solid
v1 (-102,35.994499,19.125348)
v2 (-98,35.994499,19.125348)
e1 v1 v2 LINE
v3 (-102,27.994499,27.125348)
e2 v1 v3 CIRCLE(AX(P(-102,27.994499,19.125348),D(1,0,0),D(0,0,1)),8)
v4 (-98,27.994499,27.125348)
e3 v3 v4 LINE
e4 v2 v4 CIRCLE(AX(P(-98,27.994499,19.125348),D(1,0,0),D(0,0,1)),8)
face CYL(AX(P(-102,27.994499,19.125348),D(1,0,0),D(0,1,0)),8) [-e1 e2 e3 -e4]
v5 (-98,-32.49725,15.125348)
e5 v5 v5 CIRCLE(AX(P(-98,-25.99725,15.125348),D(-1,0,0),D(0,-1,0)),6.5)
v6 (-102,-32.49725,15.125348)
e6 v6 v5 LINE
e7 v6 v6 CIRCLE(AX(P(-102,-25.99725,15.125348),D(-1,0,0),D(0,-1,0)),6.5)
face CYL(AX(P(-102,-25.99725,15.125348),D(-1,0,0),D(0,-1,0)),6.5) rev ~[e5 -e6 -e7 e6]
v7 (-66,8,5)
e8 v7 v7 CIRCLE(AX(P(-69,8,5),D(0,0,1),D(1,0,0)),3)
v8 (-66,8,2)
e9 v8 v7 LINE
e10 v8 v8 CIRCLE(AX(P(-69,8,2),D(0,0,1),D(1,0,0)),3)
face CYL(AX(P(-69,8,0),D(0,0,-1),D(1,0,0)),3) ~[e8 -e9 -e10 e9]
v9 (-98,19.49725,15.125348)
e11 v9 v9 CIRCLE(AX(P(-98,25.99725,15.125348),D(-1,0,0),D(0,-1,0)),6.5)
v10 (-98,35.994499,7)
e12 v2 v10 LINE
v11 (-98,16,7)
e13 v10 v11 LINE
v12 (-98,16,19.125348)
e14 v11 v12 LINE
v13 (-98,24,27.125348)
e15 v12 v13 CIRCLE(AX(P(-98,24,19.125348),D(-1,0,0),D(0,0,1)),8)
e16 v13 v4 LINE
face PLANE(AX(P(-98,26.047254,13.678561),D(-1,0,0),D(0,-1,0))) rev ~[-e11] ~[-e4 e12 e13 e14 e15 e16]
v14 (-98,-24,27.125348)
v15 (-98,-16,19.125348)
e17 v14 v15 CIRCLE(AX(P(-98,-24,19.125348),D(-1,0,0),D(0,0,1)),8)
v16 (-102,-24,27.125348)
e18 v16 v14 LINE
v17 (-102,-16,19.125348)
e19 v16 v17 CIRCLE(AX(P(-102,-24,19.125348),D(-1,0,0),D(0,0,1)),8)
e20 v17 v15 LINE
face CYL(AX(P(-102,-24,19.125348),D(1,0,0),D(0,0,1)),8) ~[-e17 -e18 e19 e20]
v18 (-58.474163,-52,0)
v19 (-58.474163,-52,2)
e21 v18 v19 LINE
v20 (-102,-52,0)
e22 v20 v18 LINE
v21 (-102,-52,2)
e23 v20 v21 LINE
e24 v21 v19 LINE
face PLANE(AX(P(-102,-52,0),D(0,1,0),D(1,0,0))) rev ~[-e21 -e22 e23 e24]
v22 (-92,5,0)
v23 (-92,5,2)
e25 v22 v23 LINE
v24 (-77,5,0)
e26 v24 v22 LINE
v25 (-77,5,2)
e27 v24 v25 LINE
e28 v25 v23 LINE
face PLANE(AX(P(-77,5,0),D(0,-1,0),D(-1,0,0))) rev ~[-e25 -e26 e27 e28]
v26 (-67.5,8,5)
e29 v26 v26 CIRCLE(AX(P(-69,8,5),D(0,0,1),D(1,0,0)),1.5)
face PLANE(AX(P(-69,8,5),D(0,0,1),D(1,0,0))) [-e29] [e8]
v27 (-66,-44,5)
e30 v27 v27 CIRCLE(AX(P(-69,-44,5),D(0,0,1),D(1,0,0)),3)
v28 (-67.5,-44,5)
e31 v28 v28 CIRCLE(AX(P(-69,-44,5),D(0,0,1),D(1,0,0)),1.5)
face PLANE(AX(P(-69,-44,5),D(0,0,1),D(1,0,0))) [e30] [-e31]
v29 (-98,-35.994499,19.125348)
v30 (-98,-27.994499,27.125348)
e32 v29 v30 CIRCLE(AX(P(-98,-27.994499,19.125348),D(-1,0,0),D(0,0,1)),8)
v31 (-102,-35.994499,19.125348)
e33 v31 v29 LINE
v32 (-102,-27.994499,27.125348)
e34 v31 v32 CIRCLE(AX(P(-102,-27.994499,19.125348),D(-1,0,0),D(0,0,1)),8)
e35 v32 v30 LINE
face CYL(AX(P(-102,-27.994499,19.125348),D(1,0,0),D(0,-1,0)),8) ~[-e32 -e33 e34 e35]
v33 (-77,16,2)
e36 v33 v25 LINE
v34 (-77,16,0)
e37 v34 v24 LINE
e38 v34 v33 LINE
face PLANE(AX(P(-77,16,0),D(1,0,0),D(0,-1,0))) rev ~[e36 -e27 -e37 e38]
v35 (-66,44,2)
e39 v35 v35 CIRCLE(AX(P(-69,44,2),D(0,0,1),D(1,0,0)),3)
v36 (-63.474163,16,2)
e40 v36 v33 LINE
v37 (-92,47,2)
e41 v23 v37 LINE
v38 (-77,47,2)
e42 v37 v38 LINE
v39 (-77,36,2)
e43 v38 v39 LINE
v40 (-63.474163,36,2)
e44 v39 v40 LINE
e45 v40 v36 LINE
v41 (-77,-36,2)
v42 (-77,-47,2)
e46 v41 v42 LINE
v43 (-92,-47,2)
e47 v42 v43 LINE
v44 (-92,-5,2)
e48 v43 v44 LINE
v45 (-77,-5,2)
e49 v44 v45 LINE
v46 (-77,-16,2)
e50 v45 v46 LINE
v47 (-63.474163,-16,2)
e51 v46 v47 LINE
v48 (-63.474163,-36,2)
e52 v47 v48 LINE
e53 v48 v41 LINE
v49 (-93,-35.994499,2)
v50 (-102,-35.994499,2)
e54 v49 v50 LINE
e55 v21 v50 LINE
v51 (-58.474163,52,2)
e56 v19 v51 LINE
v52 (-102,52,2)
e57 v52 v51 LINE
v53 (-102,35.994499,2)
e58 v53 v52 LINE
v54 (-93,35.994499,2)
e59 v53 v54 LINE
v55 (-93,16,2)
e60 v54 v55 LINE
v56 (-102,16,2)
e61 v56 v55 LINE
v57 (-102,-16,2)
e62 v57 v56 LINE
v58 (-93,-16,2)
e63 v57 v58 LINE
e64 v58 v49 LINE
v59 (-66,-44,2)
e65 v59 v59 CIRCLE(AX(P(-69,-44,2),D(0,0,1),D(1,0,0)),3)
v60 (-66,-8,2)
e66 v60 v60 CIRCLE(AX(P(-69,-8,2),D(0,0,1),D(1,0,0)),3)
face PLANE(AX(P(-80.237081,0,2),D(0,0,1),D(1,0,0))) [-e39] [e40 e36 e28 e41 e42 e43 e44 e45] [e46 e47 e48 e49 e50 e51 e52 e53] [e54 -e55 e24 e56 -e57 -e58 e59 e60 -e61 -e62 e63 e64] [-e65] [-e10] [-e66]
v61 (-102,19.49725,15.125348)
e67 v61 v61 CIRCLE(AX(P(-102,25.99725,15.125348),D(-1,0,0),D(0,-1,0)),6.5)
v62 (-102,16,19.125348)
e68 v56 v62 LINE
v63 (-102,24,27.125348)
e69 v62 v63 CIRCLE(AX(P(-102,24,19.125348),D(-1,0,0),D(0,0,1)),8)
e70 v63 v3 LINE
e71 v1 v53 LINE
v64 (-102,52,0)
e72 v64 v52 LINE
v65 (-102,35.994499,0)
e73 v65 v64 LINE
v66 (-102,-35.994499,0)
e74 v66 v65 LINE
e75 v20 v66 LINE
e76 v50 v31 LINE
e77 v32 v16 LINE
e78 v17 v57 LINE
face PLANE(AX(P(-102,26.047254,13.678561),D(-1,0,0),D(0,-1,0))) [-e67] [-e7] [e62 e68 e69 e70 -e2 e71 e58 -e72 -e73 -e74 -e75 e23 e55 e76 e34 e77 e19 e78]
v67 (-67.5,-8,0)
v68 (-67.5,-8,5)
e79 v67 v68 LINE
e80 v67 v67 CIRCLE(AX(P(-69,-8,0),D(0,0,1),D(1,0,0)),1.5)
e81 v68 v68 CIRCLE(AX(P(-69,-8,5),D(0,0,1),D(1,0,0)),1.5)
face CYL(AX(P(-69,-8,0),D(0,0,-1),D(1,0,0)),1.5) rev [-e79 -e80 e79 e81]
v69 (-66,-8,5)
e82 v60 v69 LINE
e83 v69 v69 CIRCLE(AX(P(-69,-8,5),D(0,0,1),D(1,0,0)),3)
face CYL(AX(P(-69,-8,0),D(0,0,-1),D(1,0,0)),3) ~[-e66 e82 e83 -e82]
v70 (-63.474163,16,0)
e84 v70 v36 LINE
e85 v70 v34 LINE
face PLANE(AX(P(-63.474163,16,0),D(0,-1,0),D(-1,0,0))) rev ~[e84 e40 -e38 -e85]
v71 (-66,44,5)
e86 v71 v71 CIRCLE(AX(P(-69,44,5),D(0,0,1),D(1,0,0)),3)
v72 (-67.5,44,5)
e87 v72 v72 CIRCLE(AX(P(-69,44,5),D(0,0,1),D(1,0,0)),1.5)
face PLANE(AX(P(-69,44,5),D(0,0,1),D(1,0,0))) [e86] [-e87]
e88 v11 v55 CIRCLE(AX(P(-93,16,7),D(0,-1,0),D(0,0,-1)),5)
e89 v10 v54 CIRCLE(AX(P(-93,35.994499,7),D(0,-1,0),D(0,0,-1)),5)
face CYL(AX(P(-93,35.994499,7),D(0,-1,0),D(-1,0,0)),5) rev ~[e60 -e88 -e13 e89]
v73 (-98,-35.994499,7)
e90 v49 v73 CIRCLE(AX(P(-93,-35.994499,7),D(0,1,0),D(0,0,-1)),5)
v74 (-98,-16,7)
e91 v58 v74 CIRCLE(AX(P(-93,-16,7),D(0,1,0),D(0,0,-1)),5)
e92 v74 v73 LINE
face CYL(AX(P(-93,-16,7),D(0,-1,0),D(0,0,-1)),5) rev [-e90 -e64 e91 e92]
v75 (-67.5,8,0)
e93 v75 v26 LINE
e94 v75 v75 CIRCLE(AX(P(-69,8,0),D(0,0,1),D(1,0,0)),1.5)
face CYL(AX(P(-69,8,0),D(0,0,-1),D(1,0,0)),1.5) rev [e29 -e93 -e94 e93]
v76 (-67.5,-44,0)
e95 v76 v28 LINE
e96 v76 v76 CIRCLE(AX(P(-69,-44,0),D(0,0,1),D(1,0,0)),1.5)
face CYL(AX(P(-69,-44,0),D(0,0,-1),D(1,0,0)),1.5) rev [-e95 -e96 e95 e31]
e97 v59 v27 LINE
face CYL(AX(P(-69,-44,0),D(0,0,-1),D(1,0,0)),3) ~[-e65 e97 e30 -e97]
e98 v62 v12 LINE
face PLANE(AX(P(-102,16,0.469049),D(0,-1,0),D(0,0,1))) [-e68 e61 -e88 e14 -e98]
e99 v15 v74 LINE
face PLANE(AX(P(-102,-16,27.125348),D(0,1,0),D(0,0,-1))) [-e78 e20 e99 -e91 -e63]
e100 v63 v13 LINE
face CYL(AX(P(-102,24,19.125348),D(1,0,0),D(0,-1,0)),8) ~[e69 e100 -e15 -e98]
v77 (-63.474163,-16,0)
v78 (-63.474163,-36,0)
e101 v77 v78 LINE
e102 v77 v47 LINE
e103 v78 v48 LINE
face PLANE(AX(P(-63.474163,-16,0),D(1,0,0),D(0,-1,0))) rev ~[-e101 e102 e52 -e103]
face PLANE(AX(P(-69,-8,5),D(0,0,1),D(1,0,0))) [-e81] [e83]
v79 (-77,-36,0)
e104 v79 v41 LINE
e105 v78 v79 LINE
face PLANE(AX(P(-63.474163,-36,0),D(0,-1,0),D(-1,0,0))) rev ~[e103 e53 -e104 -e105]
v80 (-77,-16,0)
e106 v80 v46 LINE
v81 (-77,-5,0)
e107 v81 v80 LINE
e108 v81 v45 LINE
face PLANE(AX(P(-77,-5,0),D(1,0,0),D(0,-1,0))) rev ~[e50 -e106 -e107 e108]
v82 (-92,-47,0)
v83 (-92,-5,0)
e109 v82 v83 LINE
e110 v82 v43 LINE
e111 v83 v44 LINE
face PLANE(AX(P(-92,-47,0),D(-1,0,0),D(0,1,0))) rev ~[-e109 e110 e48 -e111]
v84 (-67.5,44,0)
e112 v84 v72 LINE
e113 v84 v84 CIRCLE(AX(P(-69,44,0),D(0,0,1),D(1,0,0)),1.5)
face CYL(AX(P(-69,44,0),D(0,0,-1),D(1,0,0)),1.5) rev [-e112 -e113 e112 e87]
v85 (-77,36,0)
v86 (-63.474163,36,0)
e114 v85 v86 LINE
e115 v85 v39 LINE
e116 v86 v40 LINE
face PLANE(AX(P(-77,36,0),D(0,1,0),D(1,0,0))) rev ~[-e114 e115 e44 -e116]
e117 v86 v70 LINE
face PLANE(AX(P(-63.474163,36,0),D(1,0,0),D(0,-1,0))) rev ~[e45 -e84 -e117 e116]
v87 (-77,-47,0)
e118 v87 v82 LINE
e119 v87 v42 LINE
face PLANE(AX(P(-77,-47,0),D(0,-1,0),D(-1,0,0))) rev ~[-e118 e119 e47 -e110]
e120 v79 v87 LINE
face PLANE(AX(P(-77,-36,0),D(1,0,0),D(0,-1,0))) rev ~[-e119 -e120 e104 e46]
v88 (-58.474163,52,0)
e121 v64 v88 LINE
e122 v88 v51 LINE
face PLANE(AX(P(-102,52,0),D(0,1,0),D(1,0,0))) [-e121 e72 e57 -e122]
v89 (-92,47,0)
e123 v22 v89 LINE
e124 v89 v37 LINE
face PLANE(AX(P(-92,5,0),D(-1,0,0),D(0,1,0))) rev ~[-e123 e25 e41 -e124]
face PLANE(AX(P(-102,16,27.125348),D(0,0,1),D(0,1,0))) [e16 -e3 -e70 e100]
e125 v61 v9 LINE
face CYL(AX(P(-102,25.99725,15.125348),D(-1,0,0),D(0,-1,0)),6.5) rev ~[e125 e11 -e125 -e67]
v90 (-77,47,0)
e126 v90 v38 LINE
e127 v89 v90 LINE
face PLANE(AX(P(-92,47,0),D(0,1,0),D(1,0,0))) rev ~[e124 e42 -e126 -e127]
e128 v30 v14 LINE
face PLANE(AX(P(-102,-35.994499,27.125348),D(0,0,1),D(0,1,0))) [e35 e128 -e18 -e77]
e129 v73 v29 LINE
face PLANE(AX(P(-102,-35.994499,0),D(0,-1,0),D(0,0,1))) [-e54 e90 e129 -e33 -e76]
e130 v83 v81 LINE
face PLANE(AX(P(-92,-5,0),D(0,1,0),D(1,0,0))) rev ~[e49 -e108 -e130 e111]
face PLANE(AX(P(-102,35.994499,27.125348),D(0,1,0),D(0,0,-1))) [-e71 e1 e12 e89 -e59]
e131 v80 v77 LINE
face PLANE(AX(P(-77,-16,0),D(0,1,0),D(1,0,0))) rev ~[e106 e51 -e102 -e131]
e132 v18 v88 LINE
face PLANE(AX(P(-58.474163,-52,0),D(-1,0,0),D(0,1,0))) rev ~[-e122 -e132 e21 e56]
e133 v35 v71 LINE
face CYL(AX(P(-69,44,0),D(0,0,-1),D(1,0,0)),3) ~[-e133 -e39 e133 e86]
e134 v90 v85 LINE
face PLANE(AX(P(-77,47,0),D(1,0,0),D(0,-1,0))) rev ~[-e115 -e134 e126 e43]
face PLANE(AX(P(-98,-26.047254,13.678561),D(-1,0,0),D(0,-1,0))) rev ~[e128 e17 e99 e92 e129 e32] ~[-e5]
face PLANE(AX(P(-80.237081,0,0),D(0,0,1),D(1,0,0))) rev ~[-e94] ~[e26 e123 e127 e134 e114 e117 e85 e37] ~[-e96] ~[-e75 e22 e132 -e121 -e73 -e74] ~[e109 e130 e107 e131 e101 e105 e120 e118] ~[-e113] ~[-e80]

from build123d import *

# Parameters (mm, degrees)
F0_R     = 3
F0_R_2   = 1.5
F1_DEPTH = 2
F0_W     = 43.5258374241
F0_H     = 104
F2_DEPTH = 5
F4_R     = 6.5
F5_DEPTH = 4
F6_R     = 5
F7_R     = 8


# Not quite as in the source:
# - a feature names something its author has since deleted; it is built from what else it names


with BuildPart() as f1:
    # F0 (on Top) → F1 (new body)
    with BuildSketch(Plane.XY):
        Polygon((21, 52), (20, 52), (-20, 52), (-21, 52), (-21, -52), (-20, -52), (20, -52), (21, -52), align=None)
        with Locations((-13, -44)):
            Circle(F0_R, mode=Mode.SUBTRACT)
        with Locations((13, -44)):
            Circle(F0_R, mode=Mode.SUBTRACT)
        with Locations((-13, -8)):
            Circle(F0_R, mode=Mode.SUBTRACT)
        Polygon((-5, -16), (-5, -5), (5, -5), (5, -16), (16, -16), (16, -36), (5, -36), (5, -47), (-5, -47), (-5, -36), (-16, -36), (-16, -16), align=None, mode=Mode.SUBTRACT)
        with Locations((13, -8)):
            Circle(F0_R, mode=Mode.SUBTRACT)
        with Locations((-13, 8)):
            Circle(F0_R, mode=Mode.SUBTRACT)
        with Locations((13, 8)):
            Circle(F0_R, mode=Mode.SUBTRACT)
        with Locations((-13, 44)):
            Circle(F0_R, mode=Mode.SUBTRACT)
        Polygon((-5, 36), (-5, 47), (5, 47), (5, 36), (16, 36), (16, 16), (5, 16), (5, 5), (-5, 5), (-5, 16), (-16, 16), (-16, 36), align=None, mode=Mode.SUBTRACT)
        with Locations((13, 44)):
            Circle(F0_R, mode=Mode.SUBTRACT)
        with Locations((-13, 8)):
            Circle(F0_R)
        with Locations((-13, 8)):
            Circle(F0_R_2, mode=Mode.SUBTRACT)
        with Locations((-13, 44)):
            Circle(F0_R)
        with Locations((-13, 44)):
            Circle(F0_R_2, mode=Mode.SUBTRACT)
    extrude(amount=F1_DEPTH)

    # F0 (on Top) → F2, piece 2 (join)
    with BuildSketch(Plane.XY):
        with Locations((-13, 8)):
            Circle(F0_R)
        with Locations((-13, 8)):
            Circle(F0_R_2, mode=Mode.SUBTRACT)
        with Locations((-13, 44)):
            Circle(F0_R)
        with Locations((-13, 44)):
            Circle(F0_R_2, mode=Mode.SUBTRACT)
        with Locations((13, 44)):
            Circle(F0_R)
        with Locations((13, 44)):
            Circle(F0_R_2, mode=Mode.SUBTRACT)
        with Locations((13, 8)):
            Circle(F0_R)
        with Locations((13, 8)):
            Circle(F0_R_2, mode=Mode.SUBTRACT)
        with Locations((-13, -8)):
            Circle(F0_R)
        with Locations((-13, -8)):
            Circle(F0_R_2, mode=Mode.SUBTRACT)
        with Locations((13, -8)):
            Circle(F0_R)
        with Locations((13, -8)):
            Circle(F0_R_2, mode=Mode.SUBTRACT)
        with Locations((-13, -44)):
            Circle(F0_R)
        with Locations((-13, -44)):
            Circle(F0_R_2, mode=Mode.SUBTRACT)
        with Locations((13, -44)):
            Circle(F0_R)
        with Locations((13, -44)):
            Circle(F0_R_2, mode=Mode.SUBTRACT)
    extrude(amount=F2_DEPTH)


with BuildPart() as f1b:
    # F0 (on Top) → F1, piece 2 (new body)
    with BuildSketch(Plane.XY):
        with Locations((-80.2370812879, 0)):
            Rectangle(F0_W, F0_H)
        with Locations((-69, -44)):
            Circle(F0_R, mode=Mode.SUBTRACT)
        Polygon((-77, -47), (-92, -47), (-92, -5), (-77, -5), (-77, -16), (-63.4741625759, -16), (-63.4741625759, -36), (-77, -36), align=None, mode=Mode.SUBTRACT)
        with Locations((-69, -8)):
            Circle(F0_R, mode=Mode.SUBTRACT)
        with Locations((-69, 8)):
            Circle(F0_R, mode=Mode.SUBTRACT)
        Polygon((-92, 47), (-77, 47), (-77, 36), (-63.4741625759, 36), (-63.4741625759, 16), (-77, 16), (-77, 5), (-92, 5), align=None, mode=Mode.SUBTRACT)
        with Locations((-69, 44)):
            Circle(F0_R, mode=Mode.SUBTRACT)
    extrude(amount=F1_DEPTH)

    # F0 (on Top) → F2 (join)
    with BuildSketch(Plane.XY):
        with Locations((-69, 44)):
            Circle(F0_R)
        with Locations((-69, 44)):
            Circle(F0_R_2, mode=Mode.SUBTRACT)
        with Locations((-69, 8)):
            Circle(F0_R)
        with Locations((-69, 8)):
            Circle(F0_R_2, mode=Mode.SUBTRACT)
        with Locations((-69, -8)):
            Circle(F0_R)
        with Locations((-69, -8)):
            Circle(F0_R_2, mode=Mode.SUBTRACT)
        with Locations((-69, -44)):
            Circle(F0_R)
        with Locations((-69, -44)):
            Circle(F0_R_2, mode=Mode.SUBTRACT)
    extrude(amount=F2_DEPTH)

    # F4 (on face) → F5 (join)
    with BuildSketch(Plane(origin=(-102, 0, 0), x_dir=(0, -1, 0), z_dir=(-1, 0, 0))):
        Polygon((-16, 27.1253478074), (-35.9944990628, 27.1253478074), (-35.9944990628, 0), (-16, 0.4690492824), align=None)
        with Locations((-25.9972495314, 15.1253478074)):
            Circle(F4_R, mode=Mode.SUBTRACT)
        Polygon((16, 0.4690492824), (35.9944990628, 0), (35.9944990628, 27.1253478074), (16, 27.1253478074), align=None)
        with Locations((25.9972495314, 15.1253478074)):
            Circle(F4_R, mode=Mode.SUBTRACT)
    extrude(amount=-F5_DEPTH)

    # F6
    f6_edges = [f1b.edges().sort_by_distance(p)[0] for p in [
        (-98, 25.99725, 2),
        (-98, -25.99725, 2),
    ]]
    fillet(f6_edges, radius=F6_R)

    # F7
    f7_edges = [f1b.edges().sort_by_distance(p)[0] for p in [
        (-100, 35.994499, 27.125348),
        (-100, -16, 27.125348),
        (-100, 16, 27.125348),
        (-100, -35.994499, 27.125348),
    ]]
    fillet(f7_edges, radius=F7_R)


solid = f1b.part
